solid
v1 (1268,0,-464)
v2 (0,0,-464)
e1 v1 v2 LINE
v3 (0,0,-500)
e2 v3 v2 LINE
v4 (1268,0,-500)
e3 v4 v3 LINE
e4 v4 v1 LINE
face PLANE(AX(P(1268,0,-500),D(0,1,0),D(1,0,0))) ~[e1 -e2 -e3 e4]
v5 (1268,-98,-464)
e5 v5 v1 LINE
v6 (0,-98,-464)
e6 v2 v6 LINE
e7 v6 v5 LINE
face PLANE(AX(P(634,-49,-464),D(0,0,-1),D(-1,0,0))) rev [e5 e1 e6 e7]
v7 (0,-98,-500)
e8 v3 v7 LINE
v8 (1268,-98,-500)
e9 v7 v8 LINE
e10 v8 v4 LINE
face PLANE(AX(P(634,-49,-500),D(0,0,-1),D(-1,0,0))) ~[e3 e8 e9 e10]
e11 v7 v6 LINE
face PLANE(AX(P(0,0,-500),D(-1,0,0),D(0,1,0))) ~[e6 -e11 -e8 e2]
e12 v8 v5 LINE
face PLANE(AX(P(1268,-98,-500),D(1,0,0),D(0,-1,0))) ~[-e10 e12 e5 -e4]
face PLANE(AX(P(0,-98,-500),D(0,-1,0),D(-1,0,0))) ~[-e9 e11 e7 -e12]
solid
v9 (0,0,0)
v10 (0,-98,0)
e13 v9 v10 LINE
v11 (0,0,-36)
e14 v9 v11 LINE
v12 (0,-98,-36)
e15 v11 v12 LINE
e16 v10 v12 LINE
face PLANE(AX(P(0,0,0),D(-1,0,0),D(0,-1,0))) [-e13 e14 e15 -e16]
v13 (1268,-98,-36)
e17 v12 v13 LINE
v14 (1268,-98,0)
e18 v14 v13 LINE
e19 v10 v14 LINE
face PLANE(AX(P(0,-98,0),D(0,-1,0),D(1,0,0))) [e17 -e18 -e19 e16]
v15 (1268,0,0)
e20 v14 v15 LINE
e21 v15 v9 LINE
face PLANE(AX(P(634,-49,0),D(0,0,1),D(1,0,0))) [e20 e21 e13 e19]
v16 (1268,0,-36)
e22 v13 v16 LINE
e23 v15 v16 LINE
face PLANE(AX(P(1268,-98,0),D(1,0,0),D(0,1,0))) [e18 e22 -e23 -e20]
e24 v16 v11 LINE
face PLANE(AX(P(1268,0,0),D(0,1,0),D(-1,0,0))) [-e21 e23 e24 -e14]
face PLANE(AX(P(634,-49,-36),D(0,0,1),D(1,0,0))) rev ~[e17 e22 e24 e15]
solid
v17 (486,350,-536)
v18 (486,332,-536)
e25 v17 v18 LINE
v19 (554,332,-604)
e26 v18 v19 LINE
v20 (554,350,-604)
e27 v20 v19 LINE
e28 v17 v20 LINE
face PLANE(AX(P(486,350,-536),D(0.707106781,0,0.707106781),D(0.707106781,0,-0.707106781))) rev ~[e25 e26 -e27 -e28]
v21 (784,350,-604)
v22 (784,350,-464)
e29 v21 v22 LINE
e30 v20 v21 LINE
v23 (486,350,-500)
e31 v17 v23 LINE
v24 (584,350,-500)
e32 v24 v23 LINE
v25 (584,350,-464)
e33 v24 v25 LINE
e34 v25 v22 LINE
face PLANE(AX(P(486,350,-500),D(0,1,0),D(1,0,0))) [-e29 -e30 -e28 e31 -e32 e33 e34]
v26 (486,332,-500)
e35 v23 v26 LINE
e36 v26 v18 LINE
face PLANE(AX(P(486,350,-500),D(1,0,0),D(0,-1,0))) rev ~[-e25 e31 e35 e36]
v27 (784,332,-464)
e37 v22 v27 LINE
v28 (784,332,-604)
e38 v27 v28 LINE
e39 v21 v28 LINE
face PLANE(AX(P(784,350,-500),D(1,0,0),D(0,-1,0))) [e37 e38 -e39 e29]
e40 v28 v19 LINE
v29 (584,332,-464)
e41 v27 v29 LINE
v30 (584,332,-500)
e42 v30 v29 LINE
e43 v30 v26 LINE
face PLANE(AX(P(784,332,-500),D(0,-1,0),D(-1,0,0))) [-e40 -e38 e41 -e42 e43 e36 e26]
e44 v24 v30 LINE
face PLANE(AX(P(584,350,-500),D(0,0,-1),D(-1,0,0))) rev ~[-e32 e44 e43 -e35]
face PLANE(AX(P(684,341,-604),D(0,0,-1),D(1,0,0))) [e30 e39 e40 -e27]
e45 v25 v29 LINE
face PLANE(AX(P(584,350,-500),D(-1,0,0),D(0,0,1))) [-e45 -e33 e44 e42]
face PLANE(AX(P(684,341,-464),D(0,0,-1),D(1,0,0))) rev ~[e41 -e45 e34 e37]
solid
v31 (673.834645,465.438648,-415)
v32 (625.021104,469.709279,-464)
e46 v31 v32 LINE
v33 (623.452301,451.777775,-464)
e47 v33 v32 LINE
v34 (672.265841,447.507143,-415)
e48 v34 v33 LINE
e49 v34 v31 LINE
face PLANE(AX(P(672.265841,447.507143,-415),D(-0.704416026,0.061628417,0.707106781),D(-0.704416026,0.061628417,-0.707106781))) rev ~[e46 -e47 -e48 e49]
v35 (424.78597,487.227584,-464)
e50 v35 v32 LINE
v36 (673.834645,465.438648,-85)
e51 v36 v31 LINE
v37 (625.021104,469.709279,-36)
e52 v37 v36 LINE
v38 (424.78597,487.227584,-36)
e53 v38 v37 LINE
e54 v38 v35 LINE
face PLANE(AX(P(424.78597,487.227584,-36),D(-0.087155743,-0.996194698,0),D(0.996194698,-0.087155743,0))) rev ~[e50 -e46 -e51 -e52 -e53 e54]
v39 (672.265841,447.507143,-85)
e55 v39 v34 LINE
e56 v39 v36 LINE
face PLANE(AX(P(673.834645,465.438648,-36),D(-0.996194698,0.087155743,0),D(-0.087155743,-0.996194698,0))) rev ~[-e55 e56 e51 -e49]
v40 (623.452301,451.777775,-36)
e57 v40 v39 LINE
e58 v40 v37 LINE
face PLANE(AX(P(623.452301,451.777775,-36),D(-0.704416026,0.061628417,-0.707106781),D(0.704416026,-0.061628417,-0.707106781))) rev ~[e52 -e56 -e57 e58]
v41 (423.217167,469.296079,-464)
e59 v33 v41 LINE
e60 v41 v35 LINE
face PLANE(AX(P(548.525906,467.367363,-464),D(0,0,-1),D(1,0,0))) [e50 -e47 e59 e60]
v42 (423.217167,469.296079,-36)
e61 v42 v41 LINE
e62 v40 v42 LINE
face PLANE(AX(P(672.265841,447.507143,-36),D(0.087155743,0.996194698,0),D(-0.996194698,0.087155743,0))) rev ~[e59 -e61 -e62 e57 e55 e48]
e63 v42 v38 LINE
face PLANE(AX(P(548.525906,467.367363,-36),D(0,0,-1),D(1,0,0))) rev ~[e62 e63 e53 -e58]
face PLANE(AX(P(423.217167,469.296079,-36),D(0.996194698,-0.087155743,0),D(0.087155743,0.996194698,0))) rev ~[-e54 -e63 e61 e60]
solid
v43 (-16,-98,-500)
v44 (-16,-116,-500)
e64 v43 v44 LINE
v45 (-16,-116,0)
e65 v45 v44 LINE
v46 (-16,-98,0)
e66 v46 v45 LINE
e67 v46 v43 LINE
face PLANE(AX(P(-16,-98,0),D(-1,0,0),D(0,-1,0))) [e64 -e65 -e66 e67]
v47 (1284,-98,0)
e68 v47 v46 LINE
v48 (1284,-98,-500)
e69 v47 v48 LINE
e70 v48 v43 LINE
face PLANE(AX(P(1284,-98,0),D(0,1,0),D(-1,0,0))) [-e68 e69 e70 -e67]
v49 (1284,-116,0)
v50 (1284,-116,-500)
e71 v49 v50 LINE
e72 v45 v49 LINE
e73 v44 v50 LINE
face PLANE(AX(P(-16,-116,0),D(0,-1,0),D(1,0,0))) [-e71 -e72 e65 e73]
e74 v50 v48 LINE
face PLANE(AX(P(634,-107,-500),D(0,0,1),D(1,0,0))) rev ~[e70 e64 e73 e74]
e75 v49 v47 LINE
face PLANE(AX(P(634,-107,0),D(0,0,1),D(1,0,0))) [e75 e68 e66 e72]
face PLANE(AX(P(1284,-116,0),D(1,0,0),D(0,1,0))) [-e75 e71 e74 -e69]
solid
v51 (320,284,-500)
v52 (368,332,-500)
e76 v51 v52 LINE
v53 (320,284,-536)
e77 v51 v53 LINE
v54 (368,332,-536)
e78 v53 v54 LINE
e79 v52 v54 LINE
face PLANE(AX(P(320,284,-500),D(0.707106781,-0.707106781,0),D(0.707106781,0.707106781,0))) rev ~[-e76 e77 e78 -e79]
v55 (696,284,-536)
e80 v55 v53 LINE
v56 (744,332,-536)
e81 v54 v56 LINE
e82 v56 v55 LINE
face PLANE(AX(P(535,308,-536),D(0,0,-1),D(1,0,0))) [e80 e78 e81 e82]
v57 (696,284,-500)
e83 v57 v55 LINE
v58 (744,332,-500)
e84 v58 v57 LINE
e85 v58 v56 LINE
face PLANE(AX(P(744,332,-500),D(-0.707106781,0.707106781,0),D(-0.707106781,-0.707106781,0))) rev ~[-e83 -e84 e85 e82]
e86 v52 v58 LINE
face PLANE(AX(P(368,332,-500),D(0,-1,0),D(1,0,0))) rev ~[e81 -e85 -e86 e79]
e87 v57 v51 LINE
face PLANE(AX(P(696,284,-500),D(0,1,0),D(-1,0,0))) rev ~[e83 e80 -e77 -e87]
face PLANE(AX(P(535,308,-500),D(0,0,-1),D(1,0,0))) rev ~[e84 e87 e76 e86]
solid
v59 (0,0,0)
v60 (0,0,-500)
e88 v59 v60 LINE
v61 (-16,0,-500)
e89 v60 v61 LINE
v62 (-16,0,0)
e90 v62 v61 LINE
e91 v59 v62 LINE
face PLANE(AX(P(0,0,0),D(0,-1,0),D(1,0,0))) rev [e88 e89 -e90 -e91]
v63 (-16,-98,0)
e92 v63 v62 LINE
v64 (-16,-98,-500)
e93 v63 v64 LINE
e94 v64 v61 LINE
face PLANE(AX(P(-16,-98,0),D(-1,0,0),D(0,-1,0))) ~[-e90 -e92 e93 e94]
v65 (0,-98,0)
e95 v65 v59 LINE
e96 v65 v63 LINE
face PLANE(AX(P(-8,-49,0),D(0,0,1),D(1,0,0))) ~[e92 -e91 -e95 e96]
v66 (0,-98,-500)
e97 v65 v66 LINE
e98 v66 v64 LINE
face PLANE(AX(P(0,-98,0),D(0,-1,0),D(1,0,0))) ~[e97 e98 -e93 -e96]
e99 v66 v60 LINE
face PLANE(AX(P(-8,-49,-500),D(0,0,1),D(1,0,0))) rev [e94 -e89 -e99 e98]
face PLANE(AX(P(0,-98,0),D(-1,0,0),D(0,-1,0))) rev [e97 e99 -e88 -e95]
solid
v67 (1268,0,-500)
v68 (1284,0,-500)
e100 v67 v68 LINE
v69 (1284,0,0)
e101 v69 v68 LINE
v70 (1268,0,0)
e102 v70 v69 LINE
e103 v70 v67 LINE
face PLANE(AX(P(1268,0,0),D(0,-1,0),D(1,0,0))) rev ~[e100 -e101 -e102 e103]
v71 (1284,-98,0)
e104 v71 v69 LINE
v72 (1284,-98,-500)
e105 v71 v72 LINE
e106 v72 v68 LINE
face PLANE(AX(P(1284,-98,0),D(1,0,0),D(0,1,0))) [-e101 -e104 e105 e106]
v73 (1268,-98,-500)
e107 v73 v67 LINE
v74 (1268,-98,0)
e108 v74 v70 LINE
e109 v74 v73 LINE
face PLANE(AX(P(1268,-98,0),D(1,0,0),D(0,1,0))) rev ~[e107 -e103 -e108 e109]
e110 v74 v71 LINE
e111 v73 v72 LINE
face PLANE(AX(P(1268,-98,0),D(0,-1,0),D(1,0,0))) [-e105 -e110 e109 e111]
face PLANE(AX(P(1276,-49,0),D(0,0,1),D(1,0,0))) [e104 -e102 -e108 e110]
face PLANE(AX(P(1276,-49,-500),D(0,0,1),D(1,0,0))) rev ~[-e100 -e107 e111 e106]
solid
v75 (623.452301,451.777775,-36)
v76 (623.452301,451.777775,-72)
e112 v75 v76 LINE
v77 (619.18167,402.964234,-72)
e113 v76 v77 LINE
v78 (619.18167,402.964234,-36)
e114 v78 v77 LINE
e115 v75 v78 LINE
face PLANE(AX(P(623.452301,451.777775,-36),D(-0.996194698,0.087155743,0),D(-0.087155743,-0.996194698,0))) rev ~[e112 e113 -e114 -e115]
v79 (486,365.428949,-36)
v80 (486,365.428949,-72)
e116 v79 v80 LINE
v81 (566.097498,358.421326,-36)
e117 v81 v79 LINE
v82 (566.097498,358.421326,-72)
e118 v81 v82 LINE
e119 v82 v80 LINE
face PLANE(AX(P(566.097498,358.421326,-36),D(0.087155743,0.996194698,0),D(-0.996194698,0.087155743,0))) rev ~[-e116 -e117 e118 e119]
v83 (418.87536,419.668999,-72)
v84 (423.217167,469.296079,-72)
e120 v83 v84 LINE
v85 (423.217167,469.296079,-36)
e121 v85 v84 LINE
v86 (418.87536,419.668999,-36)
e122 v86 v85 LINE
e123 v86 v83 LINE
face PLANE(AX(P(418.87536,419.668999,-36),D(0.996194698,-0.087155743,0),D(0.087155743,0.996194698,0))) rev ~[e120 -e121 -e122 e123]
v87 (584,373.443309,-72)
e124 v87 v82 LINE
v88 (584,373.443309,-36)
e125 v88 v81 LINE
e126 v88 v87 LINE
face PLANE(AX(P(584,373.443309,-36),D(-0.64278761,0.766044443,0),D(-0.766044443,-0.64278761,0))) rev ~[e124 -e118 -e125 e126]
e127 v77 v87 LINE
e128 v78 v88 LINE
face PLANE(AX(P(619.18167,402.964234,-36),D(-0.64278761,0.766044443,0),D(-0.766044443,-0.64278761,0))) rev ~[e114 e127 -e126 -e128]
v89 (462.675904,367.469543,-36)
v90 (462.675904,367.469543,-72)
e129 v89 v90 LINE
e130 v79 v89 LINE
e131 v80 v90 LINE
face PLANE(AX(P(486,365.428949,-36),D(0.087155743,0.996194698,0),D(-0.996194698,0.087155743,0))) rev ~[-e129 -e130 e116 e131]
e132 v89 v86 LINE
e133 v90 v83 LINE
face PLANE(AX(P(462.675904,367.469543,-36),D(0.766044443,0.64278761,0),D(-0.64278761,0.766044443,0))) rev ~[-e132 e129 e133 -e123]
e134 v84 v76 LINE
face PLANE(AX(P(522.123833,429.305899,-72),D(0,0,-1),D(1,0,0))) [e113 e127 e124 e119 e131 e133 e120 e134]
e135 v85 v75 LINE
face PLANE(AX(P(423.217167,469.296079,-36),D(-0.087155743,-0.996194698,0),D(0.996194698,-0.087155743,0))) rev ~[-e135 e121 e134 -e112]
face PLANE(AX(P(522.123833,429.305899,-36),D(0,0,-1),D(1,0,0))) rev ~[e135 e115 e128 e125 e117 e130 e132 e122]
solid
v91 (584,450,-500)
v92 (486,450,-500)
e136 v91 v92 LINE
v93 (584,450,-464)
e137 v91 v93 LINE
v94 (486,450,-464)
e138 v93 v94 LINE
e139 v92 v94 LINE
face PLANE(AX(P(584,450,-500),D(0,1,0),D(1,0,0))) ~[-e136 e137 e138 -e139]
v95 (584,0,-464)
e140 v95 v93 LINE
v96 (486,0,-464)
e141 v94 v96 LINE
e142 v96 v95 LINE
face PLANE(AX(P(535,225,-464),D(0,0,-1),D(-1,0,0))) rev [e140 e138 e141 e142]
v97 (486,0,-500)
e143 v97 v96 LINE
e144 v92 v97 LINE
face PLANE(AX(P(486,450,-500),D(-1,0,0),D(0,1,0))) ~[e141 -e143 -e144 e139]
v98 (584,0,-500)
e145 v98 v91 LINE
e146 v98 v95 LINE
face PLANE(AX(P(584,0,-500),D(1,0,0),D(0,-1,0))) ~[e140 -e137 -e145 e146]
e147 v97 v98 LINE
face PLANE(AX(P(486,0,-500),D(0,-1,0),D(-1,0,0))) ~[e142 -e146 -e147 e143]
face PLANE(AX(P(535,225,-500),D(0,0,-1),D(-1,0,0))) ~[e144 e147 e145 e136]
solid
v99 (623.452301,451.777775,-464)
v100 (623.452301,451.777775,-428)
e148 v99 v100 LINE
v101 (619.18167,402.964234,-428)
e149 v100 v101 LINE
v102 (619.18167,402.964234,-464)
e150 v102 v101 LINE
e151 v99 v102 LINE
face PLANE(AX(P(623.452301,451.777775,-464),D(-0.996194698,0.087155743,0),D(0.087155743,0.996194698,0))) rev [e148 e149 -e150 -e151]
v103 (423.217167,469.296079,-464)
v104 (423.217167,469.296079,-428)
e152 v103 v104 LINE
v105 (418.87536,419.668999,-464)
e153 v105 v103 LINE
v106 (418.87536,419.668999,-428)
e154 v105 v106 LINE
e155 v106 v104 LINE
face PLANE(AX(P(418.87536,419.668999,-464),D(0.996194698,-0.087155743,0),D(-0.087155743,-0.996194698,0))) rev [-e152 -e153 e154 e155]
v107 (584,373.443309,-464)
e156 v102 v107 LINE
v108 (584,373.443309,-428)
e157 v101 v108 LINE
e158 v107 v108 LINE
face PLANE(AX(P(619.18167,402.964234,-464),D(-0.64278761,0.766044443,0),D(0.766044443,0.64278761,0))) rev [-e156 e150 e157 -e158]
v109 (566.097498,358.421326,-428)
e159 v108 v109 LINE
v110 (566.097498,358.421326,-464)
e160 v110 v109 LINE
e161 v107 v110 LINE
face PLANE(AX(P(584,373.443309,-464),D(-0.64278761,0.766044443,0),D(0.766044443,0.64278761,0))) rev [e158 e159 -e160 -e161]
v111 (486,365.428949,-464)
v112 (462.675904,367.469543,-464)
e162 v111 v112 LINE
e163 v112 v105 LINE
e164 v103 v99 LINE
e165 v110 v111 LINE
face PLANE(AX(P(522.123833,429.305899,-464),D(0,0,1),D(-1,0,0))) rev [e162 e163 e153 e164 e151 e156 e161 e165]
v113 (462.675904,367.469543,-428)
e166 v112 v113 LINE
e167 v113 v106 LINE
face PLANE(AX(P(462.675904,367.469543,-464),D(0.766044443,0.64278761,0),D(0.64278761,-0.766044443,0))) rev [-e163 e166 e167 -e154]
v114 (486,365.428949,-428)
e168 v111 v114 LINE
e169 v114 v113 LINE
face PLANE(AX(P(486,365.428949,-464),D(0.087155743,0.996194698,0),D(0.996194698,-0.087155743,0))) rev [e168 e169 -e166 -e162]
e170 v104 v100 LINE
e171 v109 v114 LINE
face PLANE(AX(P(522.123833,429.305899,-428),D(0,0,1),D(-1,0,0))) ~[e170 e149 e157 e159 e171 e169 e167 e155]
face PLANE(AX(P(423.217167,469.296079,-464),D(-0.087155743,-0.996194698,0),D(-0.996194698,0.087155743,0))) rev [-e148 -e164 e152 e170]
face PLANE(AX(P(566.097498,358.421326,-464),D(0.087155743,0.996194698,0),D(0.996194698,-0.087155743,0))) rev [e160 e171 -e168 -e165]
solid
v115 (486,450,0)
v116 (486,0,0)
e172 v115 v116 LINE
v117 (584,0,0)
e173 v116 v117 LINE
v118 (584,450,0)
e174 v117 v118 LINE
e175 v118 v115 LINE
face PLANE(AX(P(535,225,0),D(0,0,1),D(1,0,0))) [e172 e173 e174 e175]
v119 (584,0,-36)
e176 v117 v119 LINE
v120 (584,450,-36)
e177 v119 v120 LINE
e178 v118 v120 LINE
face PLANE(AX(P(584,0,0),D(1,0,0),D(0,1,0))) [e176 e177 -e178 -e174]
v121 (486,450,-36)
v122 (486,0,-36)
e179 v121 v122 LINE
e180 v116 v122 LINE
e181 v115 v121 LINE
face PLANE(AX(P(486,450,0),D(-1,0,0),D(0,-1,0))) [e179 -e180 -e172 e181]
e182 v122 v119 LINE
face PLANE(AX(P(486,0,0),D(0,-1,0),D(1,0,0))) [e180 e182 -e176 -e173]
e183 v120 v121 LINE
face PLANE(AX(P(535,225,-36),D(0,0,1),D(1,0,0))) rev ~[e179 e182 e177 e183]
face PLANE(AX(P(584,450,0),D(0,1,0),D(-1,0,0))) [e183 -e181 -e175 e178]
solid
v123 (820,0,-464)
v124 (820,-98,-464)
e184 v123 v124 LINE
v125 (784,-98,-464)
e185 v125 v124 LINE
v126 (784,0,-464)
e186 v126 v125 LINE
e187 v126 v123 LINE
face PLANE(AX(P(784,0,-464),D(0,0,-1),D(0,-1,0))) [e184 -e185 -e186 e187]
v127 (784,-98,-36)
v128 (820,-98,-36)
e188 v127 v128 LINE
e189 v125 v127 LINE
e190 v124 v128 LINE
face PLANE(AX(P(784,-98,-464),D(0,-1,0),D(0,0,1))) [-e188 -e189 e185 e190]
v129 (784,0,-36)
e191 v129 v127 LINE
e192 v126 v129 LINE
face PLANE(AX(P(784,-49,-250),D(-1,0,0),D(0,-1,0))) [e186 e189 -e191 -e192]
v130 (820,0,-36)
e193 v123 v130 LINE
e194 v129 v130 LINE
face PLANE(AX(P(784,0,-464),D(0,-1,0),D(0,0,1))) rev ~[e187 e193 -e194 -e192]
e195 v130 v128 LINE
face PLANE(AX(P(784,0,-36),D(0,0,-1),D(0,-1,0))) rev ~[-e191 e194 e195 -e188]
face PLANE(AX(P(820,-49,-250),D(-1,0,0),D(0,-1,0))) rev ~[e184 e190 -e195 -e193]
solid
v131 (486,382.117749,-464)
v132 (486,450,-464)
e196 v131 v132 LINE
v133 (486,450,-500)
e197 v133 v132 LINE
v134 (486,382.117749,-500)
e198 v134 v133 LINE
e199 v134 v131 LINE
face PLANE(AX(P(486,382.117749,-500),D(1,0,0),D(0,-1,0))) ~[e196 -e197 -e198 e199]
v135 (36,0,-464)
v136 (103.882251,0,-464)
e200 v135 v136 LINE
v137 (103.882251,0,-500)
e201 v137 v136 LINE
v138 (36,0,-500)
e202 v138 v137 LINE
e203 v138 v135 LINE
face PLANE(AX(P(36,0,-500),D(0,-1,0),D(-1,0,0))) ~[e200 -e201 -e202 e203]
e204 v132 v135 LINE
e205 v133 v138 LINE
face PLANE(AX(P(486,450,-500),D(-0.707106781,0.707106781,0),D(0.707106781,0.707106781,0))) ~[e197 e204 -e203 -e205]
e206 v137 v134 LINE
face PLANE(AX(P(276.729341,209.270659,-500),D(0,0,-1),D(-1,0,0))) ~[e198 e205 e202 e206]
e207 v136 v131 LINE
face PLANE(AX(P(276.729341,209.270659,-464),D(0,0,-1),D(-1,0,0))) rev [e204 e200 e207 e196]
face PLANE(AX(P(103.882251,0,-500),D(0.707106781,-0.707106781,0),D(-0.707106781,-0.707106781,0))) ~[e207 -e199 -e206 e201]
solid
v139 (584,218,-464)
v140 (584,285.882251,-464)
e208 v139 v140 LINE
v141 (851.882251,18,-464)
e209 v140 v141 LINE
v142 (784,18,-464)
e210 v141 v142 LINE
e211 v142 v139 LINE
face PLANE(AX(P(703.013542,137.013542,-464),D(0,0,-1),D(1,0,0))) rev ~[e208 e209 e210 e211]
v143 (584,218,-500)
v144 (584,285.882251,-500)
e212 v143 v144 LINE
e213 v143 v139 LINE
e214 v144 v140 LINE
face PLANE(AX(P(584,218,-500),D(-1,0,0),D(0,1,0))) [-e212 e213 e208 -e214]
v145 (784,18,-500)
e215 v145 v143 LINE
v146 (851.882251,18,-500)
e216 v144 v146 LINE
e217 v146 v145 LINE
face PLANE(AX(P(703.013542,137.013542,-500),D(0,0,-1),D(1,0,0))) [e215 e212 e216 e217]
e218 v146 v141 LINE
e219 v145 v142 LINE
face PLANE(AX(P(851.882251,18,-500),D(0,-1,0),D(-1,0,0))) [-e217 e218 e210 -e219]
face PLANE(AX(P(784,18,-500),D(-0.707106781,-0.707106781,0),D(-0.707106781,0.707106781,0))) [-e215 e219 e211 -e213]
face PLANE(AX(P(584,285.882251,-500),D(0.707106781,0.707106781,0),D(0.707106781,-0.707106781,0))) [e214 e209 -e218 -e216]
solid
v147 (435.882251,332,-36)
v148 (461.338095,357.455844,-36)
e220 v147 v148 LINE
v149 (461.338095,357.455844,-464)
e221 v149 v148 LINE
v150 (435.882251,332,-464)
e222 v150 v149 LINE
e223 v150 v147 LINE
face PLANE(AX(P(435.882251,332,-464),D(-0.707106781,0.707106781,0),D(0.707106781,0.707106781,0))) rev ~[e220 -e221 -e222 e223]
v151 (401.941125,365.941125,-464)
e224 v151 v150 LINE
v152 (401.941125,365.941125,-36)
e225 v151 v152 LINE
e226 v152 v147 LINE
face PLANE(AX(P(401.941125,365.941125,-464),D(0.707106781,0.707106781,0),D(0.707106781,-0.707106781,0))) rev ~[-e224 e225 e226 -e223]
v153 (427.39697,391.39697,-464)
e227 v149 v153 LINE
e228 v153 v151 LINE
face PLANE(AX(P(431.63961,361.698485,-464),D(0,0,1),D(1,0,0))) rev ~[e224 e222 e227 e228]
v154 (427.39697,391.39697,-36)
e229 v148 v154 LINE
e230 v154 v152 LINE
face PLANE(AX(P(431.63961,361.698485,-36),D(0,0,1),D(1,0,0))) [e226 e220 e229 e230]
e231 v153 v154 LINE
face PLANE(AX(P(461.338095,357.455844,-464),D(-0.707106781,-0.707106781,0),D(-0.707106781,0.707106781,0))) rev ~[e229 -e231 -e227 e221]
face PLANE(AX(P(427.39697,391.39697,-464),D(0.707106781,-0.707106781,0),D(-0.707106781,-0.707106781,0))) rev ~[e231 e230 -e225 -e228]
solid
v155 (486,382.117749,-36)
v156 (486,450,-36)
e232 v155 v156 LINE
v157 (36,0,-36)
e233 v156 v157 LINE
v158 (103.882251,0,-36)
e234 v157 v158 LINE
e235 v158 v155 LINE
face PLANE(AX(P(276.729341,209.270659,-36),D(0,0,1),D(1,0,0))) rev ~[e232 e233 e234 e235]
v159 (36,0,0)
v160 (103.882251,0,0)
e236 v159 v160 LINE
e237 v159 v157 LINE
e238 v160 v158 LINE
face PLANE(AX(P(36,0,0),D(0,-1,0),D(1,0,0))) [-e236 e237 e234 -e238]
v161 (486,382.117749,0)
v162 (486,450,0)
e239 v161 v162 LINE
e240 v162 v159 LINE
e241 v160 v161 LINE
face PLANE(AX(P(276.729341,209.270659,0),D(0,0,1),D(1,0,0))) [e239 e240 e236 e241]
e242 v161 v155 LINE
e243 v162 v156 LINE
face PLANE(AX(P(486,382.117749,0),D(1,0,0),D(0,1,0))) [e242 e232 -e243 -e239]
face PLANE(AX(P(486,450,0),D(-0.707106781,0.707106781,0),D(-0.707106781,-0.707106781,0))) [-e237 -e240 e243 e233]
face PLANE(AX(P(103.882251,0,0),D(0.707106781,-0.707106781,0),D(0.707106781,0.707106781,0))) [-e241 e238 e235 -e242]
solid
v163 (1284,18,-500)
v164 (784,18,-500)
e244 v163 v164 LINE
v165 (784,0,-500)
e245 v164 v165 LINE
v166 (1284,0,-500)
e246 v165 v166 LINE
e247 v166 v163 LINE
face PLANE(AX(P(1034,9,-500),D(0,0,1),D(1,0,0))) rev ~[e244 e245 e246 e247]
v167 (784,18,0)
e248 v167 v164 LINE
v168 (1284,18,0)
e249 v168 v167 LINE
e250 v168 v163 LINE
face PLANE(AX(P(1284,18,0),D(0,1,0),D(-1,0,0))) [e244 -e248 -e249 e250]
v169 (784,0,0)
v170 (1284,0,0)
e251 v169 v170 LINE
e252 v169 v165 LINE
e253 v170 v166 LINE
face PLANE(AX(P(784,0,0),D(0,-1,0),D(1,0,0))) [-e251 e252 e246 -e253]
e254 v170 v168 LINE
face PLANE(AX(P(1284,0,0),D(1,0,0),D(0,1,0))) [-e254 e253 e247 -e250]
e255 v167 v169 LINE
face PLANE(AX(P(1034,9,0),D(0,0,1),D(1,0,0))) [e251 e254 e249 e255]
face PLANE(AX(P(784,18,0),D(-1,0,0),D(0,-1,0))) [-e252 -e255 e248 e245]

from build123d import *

# Parameters (mm, degrees)
F1_DEPTH       = 500
F2_DEPTH       = 36
F3_DEPTH       = 36
F4_DEPTH       = 36
F5_DEPTH       = 500
F0_W           = 16
F0_H           = 98
F6_DEPTH       = 500
F8_DEPTH       = 36
F9_DEPTH       = 428
F14_W          = 98
F14_H          = 428
F15_DEPTH      = 36
F16_W          = 98
F16_H          = 48
F17_DEPTH      = 36
F16_H_2        = 18
F18_DEPTH      = 104
F18_DEPTH_BACK = 36
F19_W          = 98
F19_H          = 36
F20_DEPTH      = 18
F22_DEPTH      = 36
F24_DEPTH      = 428
F26_DEPTH      = 18


with BuildPart() as f1:
    # F0 (on Top) → F1 (new body)
    with BuildSketch(Plane.XY):
        Polygon((1268, -98), (0, -98), (-16, -98), (-16, -116), (1284, -116), (1284, -98), align=None)
    extrude(amount=-F1_DEPTH)


with BuildPart() as f2:
    # F0 (on Top) → F2 (new body)
    with BuildSketch(Plane.XY):
        Polygon((36, 0), (0, 0), (0, -98), (1268, -98), (1268, 0), (784, 0), (584, 0), (486, 0), (103.8822509939, 0), align=None)
    extrude(amount=-F2_DEPTH)


with BuildPart() as f3:
    # F0 (on Top) → F3 (new body)
    with BuildSketch(Plane.XY):
        Polygon((584, 450), (486, 450), (486, 382.1177490061), (486, 0), (584, 0), align=None)
    extrude(amount=-F3_DEPTH)


with BuildPart() as f4:
    # F0 (on Top) → F4 (new body)
    with BuildSketch(Plane.XY):
        Polygon((486, 450), (36, 0), (103.8822509939, 0), (486, 382.1177490061), align=None)
    extrude(amount=-F4_DEPTH)


with BuildPart() as f5:
    # F0 (on Top) → F5 (new body)
    with BuildSketch(Plane.XY):
        Polygon((784, 0), (1268, 0), (1284, 0), (1284, 18), (784, 18), align=None)
    extrude(amount=-F5_DEPTH)


with BuildPart() as f6:
    # F0 (on Top) → F6 (new body)
    with BuildSketch(Plane.XY):
        with Locations((1276, -49)):
            Rectangle(F0_W, F0_H)
    extrude(amount=-F6_DEPTH)


with BuildPart() as f8:
    # F7 (on face) → F8 (new body)
    with BuildSketch(Plane(origin=(0, 0, -36), x_dir=(1, 0, 0), z_dir=(0, 0, -1))):
        Polygon((418.8753596794, -419.6689985812), (423.2171666194, -469.2960789942), (623.4523009358, -451.7777747019), (619.1816695412, -402.9642344955), (584, -373.4433085592), (584, -450), (486, -450), (486, -365.4289487301), (462.6759038301, -367.469542732), align=None)
        Polygon((566.0974979401, -358.4213256836), (486, -365.4289487301), (486, -450), (584, -450), (584, -373.4433085592), align=None)
    extrude(amount=F8_DEPTH)


with BuildPart() as f9:
    # F7 (on face) → F9 (new body)
    with BuildSketch(Plane(origin=(0, 0, -36), x_dir=(1, 0, 0), z_dir=(0, 0, -1))):
        Polygon((423.2171666194, -469.2960789942), (424.7859699888, -487.2275835599), (673.8346445118, -465.438647873), (672.2658411423, -447.5071433073), (623.4523009358, -451.7777747019), align=None)
    extrude(amount=F9_DEPTH)

    # F25 (on face) → F26 (cut, through all)
    with BuildSketch(Plane(origin=(43.9610143142, 502.4766928934, 0), x_dir=(0.9961946981, -0.0871557427, 0), z_dir=(-0.0871557427, -0.9961946981, 0))):
        Polygon((630.7048491943, -36), (581.7048491943, -36), (630.7048491943, -85), align=None)
        Polygon((630.7048491943, -464), (630.7048491943, -415), (581.7048491943, -464), align=None)
    extrude(amount=-F26_DEPTH, mode=Mode.SUBTRACT)


with BuildPart() as f11_1:
    # F11: instance of F3
    add(f3.part.mirror(Plane(origin=(317, -53.5, -250), x_dir=(1, 0, 0), z_dir=(0, 0, 1))))


with BuildPart() as f11_2:
    # F11: instance of F2
    add(f2.part.mirror(Plane(origin=(317, -53.5, -250), x_dir=(1, 0, 0), z_dir=(0, 0, 1))))


with BuildPart() as f11_3:
    # F11: instance of F4
    add(f4.part.mirror(Plane(origin=(317, -53.5, -250), x_dir=(1, 0, 0), z_dir=(0, 0, 1))))


with BuildPart() as f11_4:
    # F11: instance of F8
    add(f8.part.mirror(Plane(origin=(317, -53.5, -250), x_dir=(1, 0, 0), z_dir=(0, 0, 1))))


with BuildPart() as f13_1:
    # F13: instance of F6
    add(f6.part.mirror(Plane(origin=(634, -107, -250), x_dir=(0, -1, 0), z_dir=(-1, 0, 0))))


with BuildPart() as f15:
    # F14 (on face) → F15 (new body)
    with BuildSketch(Plane(origin=(784, 0, 0), x_dir=(0, -1, 0), z_dir=(-1, 0, 0))):
        with Locations((49, -250)):
            Rectangle(F14_W, F14_H)
    extrude(amount=-F15_DEPTH)


with BuildPart() as f17:
    # F16 (on face) → F17 (new body)
    with BuildSketch(Plane(origin=(0, 0, -500), x_dir=(1, 0, 0), z_dir=(0, 0, -1))):
        with Locations((535, -308)):
            Rectangle(F16_W, F16_H)
        Polygon((368, -332), (486, -332), (486, -284), (320, -284), align=None)
        Polygon((584, -284), (584, -332), (744, -332), (696, -284), align=None)
    extrude(amount=F17_DEPTH)


with BuildPart() as f18:
    # F16 (on face) → F18 (new body, two sides)
    with BuildSketch(Plane(origin=(0, 0, -500), x_dir=(1, 0, 0), z_dir=(0, 0, -1))) as f18_sk:
        Polygon((584, -332), (584, -350), (784, -350), (784, -332), (744, -332), align=None)
        with Locations((535, -341)):
            Rectangle(F16_W, F16_H_2)
    extrude(amount=F18_DEPTH)
    extrude(f18_sk.sketch, amount=-F18_DEPTH_BACK)

    # F19 (on face) → F20 (cut, through all)
    with BuildSketch(Plane(origin=(0, 350, 0), x_dir=(-1, 0, 0), z_dir=(0, 1, 0))):
        with Locations((-535, -482)):
            Rectangle(F19_W, F19_H)
        Polygon((-486, -604), (-486, -536), (-554, -604), align=None)
    extrude(amount=-F20_DEPTH, mode=Mode.SUBTRACT)


with BuildPart() as f22:
    # F21 (on face) → F22 (new body)
    with BuildSketch(Plane(origin=(0, 0, -500), x_dir=(1, 0, 0), z_dir=(0, 0, -1))):
        Polygon((851.8822509939, -18), (784, -18), (584, -218), (584, -285.8822509939), align=None)
    extrude(amount=-F22_DEPTH)


with BuildPart() as f24:
    # F23 (on face) → F24 (new body, through all)
    with BuildSketch(Plane.XY.offset(-464)):
        Polygon((461.3380951166, 357.4558441227), (427.3969696197, 391.3969696197), (401.941125497, 365.941125497), (435.8822509939, 332), align=None)
    extrude(amount=F24_DEPTH)


solid = Compound([f1.part, f2.part, f3.part, f4.part, f5.part, f6.part, f8.part, f9.part, f11_1.part, f11_2.part, f11_3.part, f11_4.part, f13_1.part, f15.part, f17.part, f18.part, f22.part, f24.part])
